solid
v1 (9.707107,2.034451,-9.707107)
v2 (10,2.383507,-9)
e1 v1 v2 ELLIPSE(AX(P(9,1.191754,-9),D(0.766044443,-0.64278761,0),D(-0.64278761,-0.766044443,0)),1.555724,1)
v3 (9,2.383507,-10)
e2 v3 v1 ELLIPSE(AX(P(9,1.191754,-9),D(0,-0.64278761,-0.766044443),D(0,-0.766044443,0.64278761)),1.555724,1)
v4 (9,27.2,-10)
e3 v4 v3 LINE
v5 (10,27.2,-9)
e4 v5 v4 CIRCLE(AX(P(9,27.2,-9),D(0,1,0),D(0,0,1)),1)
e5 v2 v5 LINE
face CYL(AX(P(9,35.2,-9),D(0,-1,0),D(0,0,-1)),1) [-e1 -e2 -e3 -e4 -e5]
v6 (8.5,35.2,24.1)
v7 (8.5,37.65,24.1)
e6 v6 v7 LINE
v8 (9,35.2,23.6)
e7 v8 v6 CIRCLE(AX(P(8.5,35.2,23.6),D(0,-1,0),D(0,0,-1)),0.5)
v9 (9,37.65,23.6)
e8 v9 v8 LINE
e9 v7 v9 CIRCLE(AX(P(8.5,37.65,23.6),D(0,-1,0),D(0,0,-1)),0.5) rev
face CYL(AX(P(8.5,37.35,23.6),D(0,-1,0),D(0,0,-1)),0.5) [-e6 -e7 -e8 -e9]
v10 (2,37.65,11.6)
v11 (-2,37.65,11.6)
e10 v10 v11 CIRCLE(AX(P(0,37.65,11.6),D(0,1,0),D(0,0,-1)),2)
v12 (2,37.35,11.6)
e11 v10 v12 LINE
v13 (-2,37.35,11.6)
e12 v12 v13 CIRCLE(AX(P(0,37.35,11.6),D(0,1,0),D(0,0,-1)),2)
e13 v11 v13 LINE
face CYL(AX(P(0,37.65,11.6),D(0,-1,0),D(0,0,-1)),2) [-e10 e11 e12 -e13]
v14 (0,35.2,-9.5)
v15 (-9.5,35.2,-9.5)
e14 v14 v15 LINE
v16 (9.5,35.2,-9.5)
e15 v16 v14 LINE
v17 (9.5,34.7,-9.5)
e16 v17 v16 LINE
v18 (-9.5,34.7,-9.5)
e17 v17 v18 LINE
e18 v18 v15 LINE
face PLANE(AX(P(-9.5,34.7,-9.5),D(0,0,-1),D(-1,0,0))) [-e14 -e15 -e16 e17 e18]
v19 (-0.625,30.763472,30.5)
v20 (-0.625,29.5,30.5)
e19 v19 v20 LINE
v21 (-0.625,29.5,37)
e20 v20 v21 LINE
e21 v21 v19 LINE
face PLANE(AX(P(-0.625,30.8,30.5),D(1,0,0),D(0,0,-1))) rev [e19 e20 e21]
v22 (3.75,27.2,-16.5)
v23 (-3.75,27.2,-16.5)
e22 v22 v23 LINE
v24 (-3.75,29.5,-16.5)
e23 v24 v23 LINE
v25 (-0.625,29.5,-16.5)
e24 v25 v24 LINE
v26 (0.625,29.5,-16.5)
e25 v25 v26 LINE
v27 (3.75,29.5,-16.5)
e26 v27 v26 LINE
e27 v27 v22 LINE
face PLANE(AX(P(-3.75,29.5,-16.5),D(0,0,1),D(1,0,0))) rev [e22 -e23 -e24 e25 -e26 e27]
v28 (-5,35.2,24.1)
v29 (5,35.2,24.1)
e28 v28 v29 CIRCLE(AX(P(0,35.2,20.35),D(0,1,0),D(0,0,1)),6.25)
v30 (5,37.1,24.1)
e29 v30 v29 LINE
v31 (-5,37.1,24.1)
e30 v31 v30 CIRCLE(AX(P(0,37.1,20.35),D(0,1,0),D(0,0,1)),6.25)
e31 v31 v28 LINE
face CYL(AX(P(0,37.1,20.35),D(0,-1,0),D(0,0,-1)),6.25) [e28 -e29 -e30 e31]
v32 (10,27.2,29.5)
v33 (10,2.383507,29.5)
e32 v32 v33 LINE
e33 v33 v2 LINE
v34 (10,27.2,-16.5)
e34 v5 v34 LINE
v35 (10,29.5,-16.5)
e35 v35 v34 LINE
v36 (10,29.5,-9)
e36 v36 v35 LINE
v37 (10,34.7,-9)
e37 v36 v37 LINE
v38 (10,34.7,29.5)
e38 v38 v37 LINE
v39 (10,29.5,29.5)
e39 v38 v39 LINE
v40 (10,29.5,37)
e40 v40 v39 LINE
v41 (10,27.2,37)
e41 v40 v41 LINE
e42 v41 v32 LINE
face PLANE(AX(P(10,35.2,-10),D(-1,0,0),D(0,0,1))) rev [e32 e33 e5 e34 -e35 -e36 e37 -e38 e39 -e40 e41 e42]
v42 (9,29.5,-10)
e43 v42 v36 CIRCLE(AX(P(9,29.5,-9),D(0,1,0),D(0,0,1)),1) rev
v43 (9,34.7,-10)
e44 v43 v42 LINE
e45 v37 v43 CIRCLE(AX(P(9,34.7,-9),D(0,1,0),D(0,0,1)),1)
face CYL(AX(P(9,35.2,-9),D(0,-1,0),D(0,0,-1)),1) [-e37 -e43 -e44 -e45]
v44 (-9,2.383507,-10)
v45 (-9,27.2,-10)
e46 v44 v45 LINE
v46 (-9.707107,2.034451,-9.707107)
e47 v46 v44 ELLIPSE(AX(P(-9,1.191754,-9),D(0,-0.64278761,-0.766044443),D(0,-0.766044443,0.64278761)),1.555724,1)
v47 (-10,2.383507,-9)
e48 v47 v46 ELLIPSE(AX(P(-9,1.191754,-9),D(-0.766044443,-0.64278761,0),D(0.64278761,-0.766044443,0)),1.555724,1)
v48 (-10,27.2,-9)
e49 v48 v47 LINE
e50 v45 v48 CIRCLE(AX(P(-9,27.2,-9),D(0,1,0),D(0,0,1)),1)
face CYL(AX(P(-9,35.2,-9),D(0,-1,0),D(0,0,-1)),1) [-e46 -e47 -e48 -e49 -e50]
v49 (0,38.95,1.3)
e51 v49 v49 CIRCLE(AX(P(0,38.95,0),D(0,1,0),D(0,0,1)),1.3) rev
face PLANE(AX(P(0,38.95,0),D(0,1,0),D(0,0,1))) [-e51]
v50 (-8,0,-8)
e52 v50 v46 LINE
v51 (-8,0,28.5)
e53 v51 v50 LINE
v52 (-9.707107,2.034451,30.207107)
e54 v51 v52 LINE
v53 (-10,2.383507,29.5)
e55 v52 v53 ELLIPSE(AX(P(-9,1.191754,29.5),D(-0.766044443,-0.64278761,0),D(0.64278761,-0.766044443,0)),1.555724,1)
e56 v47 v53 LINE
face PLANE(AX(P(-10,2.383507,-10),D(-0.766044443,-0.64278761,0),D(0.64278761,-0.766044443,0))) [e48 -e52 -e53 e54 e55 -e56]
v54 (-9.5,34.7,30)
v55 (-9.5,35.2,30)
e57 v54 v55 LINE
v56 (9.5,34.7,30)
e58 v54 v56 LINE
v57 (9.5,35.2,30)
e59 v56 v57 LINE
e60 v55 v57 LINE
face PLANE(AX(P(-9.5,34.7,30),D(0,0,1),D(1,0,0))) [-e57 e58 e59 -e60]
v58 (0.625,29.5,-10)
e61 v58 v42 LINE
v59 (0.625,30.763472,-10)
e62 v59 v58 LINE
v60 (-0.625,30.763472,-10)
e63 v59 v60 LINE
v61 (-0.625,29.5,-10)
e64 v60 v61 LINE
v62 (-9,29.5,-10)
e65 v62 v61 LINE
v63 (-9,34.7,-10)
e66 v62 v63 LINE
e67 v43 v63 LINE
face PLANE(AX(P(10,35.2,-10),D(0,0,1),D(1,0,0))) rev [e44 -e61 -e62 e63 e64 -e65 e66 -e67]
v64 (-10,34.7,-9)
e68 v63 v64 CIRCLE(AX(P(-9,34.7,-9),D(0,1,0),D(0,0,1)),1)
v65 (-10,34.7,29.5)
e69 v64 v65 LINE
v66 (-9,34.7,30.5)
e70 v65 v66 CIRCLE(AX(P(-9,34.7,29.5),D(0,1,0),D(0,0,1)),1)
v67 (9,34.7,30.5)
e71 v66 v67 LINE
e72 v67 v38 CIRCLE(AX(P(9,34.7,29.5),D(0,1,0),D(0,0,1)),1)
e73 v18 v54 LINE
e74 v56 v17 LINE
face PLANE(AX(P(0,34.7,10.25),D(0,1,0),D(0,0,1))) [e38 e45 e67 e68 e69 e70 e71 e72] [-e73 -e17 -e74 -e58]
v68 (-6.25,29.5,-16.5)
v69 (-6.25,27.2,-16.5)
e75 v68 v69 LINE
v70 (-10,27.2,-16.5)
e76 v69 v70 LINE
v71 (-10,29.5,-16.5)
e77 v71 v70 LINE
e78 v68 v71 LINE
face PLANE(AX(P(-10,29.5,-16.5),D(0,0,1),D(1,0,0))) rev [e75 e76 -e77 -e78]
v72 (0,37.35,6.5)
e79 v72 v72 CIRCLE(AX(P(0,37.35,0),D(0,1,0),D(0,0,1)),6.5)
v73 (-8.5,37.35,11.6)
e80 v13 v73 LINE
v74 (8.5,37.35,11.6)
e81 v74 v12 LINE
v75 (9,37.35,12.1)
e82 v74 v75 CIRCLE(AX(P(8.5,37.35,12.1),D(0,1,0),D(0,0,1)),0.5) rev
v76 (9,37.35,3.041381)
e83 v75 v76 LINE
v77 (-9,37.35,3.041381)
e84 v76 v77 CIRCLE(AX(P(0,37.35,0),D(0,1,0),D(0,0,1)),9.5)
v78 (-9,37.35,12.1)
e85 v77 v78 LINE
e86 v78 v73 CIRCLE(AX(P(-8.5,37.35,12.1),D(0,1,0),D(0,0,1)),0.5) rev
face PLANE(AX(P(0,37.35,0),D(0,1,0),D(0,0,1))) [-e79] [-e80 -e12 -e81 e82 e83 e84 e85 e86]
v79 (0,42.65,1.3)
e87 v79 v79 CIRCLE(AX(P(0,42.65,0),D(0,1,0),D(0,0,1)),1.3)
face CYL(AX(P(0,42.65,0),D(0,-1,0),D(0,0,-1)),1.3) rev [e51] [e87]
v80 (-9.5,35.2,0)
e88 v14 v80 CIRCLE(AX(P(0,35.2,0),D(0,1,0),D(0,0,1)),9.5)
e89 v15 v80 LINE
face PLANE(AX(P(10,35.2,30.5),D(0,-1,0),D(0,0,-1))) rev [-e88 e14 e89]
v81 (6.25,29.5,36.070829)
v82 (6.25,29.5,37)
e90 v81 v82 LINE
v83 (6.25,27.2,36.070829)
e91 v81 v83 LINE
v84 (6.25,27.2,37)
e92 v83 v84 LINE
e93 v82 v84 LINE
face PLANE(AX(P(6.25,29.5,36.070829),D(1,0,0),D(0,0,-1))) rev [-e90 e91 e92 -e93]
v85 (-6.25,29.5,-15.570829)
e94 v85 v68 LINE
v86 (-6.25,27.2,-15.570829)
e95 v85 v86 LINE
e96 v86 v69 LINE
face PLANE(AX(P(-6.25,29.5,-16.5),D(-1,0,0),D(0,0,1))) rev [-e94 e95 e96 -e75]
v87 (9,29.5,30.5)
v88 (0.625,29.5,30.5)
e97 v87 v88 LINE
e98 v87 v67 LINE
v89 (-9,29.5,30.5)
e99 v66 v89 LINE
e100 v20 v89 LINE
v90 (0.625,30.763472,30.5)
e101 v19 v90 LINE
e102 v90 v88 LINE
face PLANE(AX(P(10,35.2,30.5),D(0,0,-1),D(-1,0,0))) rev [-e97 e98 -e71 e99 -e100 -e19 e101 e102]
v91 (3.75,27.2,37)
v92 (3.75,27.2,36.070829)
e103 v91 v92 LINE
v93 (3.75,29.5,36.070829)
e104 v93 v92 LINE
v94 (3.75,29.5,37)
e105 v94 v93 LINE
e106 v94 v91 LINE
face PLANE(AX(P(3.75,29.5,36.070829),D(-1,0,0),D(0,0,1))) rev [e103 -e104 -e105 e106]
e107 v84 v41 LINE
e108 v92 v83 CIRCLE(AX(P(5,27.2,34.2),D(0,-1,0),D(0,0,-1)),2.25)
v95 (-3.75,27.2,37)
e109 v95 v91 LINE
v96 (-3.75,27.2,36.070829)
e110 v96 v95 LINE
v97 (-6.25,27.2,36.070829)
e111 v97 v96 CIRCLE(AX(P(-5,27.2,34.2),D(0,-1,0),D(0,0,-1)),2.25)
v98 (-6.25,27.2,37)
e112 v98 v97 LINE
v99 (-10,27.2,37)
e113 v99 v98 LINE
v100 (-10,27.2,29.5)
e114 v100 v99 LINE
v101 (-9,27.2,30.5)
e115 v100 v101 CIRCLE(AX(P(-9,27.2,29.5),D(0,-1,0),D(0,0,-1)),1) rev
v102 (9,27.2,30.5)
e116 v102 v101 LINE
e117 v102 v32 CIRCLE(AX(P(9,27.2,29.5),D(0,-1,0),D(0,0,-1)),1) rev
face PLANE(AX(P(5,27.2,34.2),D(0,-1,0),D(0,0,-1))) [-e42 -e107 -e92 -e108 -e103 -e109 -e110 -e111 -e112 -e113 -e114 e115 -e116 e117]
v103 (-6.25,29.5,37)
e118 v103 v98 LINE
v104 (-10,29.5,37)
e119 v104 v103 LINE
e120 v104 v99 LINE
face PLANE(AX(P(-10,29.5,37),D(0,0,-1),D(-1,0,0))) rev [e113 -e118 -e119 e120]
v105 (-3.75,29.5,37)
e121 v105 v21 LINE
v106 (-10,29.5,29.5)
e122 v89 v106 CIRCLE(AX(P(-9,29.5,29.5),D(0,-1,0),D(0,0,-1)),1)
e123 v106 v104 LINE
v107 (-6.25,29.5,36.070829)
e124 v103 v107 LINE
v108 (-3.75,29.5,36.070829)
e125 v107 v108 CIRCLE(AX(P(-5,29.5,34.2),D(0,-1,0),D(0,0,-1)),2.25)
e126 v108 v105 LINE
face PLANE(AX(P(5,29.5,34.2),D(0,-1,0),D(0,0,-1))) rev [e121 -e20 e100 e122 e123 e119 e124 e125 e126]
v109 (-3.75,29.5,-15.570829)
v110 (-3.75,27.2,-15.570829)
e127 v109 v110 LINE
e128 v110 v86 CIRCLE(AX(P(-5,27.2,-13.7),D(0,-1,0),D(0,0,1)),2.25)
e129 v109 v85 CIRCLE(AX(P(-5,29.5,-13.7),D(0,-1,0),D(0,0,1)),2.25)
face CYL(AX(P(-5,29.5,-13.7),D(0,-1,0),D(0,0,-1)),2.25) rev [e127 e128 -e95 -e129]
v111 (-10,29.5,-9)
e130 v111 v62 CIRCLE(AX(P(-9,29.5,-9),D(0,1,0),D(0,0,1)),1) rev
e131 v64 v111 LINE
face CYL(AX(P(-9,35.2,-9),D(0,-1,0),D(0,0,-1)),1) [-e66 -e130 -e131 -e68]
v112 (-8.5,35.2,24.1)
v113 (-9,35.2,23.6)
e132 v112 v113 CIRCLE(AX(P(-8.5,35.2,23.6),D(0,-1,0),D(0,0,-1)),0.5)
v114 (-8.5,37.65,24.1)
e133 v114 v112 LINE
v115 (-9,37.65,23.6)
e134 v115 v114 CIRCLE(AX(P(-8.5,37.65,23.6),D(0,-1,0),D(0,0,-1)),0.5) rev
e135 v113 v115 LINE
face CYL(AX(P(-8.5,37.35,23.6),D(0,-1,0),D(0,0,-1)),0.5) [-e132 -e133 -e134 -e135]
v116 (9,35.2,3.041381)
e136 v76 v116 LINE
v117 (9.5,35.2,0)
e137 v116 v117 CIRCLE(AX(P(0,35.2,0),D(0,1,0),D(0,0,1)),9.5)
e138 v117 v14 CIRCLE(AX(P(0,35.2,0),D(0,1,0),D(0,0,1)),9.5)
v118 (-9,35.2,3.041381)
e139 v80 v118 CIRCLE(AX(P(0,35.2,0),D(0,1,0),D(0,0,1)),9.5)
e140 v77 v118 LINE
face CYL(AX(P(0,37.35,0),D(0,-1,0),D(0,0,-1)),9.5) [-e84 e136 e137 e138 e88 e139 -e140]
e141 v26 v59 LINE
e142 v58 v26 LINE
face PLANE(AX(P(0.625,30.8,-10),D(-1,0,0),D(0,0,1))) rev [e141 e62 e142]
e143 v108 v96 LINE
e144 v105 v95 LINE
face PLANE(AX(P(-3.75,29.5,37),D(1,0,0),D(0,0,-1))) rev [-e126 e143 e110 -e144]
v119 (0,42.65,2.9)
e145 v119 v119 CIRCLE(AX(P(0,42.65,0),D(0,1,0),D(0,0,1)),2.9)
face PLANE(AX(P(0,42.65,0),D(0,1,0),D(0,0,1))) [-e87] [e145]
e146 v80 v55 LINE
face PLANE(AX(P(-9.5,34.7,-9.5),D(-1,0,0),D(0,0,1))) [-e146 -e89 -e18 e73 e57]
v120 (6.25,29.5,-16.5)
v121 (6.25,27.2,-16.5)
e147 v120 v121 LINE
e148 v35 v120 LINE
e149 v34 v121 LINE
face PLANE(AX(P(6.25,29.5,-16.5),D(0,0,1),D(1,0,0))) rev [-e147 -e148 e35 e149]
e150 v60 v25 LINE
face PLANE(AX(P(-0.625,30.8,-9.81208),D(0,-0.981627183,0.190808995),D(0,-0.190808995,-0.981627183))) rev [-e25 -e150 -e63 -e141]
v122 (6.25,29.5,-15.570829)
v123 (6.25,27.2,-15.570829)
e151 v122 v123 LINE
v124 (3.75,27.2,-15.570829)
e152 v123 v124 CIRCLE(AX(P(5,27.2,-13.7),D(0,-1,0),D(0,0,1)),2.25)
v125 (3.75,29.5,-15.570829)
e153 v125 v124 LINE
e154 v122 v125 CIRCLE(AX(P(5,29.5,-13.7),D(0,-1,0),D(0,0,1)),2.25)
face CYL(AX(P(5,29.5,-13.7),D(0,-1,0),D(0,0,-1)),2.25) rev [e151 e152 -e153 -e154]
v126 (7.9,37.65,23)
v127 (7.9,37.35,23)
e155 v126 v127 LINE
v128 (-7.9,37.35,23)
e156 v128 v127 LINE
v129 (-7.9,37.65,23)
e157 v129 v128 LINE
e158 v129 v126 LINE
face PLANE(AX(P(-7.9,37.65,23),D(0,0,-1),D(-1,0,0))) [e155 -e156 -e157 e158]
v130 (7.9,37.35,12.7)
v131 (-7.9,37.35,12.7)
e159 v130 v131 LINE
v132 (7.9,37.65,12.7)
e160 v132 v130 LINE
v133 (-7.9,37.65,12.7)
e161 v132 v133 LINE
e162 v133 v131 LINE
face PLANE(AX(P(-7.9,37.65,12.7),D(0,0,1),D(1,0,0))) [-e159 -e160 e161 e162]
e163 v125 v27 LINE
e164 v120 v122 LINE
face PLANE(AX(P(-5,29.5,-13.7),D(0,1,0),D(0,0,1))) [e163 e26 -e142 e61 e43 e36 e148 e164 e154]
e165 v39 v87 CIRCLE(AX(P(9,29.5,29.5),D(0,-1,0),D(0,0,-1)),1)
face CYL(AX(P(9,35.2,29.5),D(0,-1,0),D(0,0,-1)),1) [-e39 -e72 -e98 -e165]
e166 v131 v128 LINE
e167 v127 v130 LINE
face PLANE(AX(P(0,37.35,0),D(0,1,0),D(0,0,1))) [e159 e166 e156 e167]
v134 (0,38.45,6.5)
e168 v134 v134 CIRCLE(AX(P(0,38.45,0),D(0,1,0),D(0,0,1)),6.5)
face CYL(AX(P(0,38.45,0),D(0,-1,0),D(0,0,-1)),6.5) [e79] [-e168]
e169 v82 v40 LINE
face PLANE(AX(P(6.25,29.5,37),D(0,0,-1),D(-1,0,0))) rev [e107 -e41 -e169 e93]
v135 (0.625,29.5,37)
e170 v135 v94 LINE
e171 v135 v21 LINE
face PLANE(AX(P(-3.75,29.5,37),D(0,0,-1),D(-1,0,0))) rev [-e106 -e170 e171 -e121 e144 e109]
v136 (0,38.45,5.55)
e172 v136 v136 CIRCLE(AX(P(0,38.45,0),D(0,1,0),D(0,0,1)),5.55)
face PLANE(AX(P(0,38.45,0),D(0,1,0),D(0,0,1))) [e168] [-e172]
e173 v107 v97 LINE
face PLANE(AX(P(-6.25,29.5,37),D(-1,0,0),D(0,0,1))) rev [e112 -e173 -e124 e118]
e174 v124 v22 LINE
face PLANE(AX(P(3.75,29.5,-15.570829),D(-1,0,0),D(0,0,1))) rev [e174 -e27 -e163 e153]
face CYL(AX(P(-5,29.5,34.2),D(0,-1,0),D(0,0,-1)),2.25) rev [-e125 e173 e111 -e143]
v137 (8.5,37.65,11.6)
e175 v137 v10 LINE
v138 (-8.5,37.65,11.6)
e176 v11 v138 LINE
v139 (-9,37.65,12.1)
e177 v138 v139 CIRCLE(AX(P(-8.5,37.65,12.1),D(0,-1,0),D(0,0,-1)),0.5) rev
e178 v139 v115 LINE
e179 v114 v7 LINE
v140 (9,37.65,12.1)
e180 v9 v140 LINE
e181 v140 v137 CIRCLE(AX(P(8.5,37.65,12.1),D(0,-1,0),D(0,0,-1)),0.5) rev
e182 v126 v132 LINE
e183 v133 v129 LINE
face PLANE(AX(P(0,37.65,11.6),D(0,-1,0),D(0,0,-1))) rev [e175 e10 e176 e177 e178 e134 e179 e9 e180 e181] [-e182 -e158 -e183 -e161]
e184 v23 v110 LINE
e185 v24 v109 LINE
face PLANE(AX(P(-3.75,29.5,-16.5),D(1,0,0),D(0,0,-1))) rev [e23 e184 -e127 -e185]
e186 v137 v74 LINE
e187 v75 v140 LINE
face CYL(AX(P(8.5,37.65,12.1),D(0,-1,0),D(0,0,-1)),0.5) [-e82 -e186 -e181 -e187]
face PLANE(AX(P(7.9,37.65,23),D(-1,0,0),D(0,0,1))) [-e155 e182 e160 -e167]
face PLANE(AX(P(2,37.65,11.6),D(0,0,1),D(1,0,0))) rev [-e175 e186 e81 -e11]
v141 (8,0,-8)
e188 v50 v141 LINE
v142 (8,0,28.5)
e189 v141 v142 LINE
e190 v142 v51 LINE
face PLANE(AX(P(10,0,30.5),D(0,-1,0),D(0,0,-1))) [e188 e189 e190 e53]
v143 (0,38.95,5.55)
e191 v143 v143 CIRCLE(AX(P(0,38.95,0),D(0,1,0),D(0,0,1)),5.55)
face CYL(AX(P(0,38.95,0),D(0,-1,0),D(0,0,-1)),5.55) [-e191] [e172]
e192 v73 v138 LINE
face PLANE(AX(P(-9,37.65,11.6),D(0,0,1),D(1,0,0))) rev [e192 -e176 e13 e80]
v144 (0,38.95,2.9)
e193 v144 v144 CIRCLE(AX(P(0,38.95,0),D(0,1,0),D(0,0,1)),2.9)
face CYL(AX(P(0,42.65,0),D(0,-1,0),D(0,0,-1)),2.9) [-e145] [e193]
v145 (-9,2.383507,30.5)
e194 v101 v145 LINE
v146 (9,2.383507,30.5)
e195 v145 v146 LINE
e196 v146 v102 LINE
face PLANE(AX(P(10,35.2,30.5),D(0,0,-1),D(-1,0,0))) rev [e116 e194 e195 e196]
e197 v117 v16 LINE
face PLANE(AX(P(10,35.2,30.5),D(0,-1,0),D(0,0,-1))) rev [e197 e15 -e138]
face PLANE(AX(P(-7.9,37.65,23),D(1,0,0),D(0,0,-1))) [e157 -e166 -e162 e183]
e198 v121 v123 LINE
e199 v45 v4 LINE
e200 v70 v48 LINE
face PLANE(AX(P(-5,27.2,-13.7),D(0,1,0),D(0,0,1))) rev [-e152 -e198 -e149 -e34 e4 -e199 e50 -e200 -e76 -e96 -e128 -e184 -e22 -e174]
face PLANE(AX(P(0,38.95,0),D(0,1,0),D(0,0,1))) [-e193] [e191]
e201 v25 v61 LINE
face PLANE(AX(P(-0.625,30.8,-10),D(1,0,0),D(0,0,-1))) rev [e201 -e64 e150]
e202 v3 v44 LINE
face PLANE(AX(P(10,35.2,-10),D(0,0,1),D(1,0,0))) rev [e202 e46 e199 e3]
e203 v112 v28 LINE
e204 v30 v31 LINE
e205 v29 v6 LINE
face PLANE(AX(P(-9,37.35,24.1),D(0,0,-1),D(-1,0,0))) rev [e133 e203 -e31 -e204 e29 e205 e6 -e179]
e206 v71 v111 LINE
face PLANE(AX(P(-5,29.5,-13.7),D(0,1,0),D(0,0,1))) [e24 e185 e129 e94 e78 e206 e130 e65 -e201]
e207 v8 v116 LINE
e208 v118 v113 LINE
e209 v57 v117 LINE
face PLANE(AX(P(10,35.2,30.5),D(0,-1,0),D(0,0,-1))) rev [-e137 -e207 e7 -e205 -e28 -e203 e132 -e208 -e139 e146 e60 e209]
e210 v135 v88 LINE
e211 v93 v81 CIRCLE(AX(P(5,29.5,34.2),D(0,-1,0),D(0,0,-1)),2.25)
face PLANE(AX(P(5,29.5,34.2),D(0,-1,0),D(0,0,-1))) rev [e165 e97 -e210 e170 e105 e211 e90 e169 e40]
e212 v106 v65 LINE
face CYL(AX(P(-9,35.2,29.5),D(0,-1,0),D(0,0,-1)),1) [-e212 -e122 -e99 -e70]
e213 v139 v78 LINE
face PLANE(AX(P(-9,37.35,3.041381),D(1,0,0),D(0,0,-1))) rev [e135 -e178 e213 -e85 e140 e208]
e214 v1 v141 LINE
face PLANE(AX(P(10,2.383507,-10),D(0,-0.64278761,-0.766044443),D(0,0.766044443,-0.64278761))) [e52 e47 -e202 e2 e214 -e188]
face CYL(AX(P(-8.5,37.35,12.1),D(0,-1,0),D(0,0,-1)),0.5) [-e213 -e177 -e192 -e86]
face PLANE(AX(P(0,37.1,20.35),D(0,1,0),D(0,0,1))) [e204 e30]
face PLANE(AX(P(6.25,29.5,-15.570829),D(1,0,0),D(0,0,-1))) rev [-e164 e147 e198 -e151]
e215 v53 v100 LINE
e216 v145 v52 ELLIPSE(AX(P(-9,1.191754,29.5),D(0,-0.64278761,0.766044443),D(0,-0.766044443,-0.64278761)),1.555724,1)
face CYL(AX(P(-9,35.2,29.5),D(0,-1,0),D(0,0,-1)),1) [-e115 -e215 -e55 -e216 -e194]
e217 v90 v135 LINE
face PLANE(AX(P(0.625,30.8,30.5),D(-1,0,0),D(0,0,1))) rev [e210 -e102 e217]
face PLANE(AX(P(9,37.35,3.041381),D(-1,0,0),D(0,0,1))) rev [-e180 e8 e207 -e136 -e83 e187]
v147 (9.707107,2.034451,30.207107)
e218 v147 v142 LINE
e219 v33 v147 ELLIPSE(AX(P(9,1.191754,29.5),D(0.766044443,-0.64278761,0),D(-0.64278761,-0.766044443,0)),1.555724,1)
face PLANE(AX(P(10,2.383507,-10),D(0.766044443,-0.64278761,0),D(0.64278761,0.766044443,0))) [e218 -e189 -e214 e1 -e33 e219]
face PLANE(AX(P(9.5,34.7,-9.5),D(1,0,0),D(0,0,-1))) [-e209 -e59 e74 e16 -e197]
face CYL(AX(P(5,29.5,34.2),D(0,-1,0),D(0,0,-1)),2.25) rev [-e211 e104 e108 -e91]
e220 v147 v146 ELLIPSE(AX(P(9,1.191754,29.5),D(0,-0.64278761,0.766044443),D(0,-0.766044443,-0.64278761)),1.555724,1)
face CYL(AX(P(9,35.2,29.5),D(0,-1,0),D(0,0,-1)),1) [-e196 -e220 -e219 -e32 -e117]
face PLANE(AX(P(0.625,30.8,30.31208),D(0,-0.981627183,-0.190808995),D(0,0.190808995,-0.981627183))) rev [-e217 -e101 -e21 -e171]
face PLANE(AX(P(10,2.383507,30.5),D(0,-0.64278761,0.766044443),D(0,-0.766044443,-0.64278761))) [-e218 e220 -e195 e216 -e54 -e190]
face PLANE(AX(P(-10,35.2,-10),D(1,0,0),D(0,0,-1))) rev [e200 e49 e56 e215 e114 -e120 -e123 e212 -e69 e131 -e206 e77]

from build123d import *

# Parameters (mm, degrees)
SKETCH1_W           = 20
SKETCH1_H           = 40.5
BOSS_EXTRUDE1_DEPTH = 35.2
CHAMFER1_SIZE       = 2
CHAMFER1_SIZE2      = 2.383507185
BOSS_EXTRUDE2_DEPTH = 2.3
SKETCH3_W           = 1.25
SKETCH3_H           = 6.5
BOSS_EXTRUDE3_DEPTH = 1.3
CHAMFER2_SIZE       = 6.687920221
CHAMFER2_SIZE_2     = 1.3
SKETCH5_OUTSIDE_W   = 35.418
SKETCH5_OUTSIDE_H   = 68.918
SKETCH5_OUTSIDE_W_2 = 19
SKETCH5_OUTSIDE_H_2 = 39.5
CUT_EXTRUDE1_DEPTH  = 0.5
BOSS_EXTRUDE4_DEPTH = 2.15
BOSS_EXTRUDE5_DEPTH = 1.9
SKETCH8_R           = 6.5
BOSS_EXTRUDE6_DEPTH = 1.1
SKETCH9_R           = 5.55
BOSS_EXTRUDE7_DEPTH = 0.5
SKETCH10_R          = 2.9
SKETCH10_R_2        = 1.3
BOSS_EXTRUDE8_DEPTH = 3.7
SKETCH11_W          = 15.8
SKETCH11_H          = 10.3
BOSS_EXTRUDE9_DEPTH = 0.3
FILLET1_R           = 0.5
FILLET2_R           = 1


with BuildPart() as part:
    # Sketch1 → Boss-Extrude1 (new body)
    with BuildSketch(Plane(origin=(0, 0, 0), x_dir=(1, 0, 0), z_dir=(0, 1, 0))):
        with Locations((0, -10.25)):
            Rectangle(SKETCH1_W, SKETCH1_H)
    extrude(amount=BOSS_EXTRUDE1_DEPTH)

    # Chamfer1
    chamfer1_edges = [part.edges().sort_by_distance(p)[0] for p in [
        (0, 0, 30.5),
        (-10, 0, 10.25),
        (0, 0, -10),
        (10, 0, 10.25),
    ]]
    chamfer1_side = [part.faces().sort_by_distance(p)[0] for p in [
        (0, 0, 10.25),
    ]]
    chamfer(chamfer1_edges, length=CHAMFER1_SIZE, length2=CHAMFER1_SIZE2, reference=chamfer1_side[0])

    # Sketch2 → Boss-Extrude2 (add)
    with BuildSketch(Plane(origin=(0, 27.2, 0), x_dir=(-1, 0, 0), z_dir=(0, 1, 0))):
        with BuildLine():
            Line((10, -10), (-10, -10))
            Line((-10, -10), (-10, -16.5))
            Line((-10, -16.5), (-6.25, -16.5))
            Line((-6.25, -16.5), (-6.25, -15.570828693))
            ThreePointArc((-6.25, -15.570828693), (-5, -11.45), (-3.75, -15.570828693))
            Line((-3.75, -15.570828693), (-3.75, -16.5))
            Line((-3.75, -16.5), (3.75, -16.5))
            Line((3.75, -16.5), (3.75, -15.570828693))
            ThreePointArc((3.75, -15.570828693), (5, -11.45), (6.25, -15.570828693))
            Line((6.25, -15.570828693), (6.25, -16.5))
            Line((6.25, -16.5), (10, -16.5))
            Line((10, -16.5), (10, -10))
        make_face()
        with BuildLine():
            Line((-6.25, 37), (-10, 37))
            Line((-10, 37), (-10, 30.5))
            Line((-10, 30.5), (10, 30.5))
            Line((10, 30.5), (10, 37))
            Line((10, 37), (6.25, 37))
            Line((6.25, 37), (6.25, 36.070828693))
            ThreePointArc((6.25, 36.070828693), (5, 31.95), (3.75, 36.070828693))
            Line((3.75, 36.070828693), (3.75, 37))
            Line((3.75, 37), (-3.75, 37))
            Line((-3.75, 37), (-3.75, 36.070828693))
            ThreePointArc((-3.75, 36.070828693), (-5, 31.95), (-6.25, 36.070828693))
            Line((-6.25, 36.070828693), (-6.25, 37))
        make_face()
    extrude(amount=BOSS_EXTRUDE2_DEPTH)

    # Sketch3 → Boss-Extrude3 (add)
    with BuildSketch(Plane(origin=(0, 29.5, 0), x_dir=(1, 0, 0), z_dir=(0, 1, 0))):
        with Locations((0, -33.75)):
            Rectangle(SKETCH3_W, SKETCH3_H)
        with Locations((0, 13.25)):
            Rectangle(SKETCH3_W, SKETCH3_H)
    extrude(amount=BOSS_EXTRUDE3_DEPTH)

    # Chamfer2
    # the kernel refuses this chamfer: 6.687920221, 1.3 mm, written as the material it takes off along each edge
    with BuildSketch(Plane(origin=(-18.001773564, 30.8, 37), x_dir=(0, 0.007343799087842576, -0.9999730339438946), z_dir=(1, 0, 0))) as chamfer2_piece_1_section:
        Polygon((CHAMFER2_SIZE * 0.999973033908, -CHAMFER2_SIZE * 0.00734379908758), (-CHAMFER2_SIZE_2 * 0.00734379908784, -CHAMFER2_SIZE_2 * 0.999973033944), (0, 0), align=None)
    chamfer2_piece_1 = extrude(amount=36.003547128, mode=Mode.PRIVATE)
    chamfer2_piece_1 = split(chamfer2_piece_1, bisect_by=Plane(origin=(0, 30.433956973, 30.5), z_dir=(0, 0, 1)), keep=Keep.TOP, mode=Mode.PRIVATE)
    add(chamfer2_piece_1, mode=Mode.SUBTRACT)
    with BuildSketch(Plane(origin=(18.001773564, 30.8, -16.5), x_dir=(0, -0.9816291836389949, -0.19079870499623547), z_dir=(-1, 0, 0))) as chamfer2_piece_2_section:
        Polygon((CHAMFER2_SIZE_2 * 0.981629183639, CHAMFER2_SIZE_2 * 0.190798704996), (-CHAMFER2_SIZE * 0.190798704989, CHAMFER2_SIZE * 0.981629183604), (0, 0), align=None)
    chamfer2_piece_2 = extrude(amount=36.003547128, mode=Mode.PRIVATE)
    chamfer2_piece_2 = split(chamfer2_piece_2, bisect_by=Plane(origin=(0, 30.433956973, -10), z_dir=(0, 0, -1)), keep=Keep.TOP, mode=Mode.PRIVATE)
    add(chamfer2_piece_2, mode=Mode.SUBTRACT)

    # Sketch5 outside → Cut-Extrude1 (cut)
    with BuildSketch(Plane(origin=(0, 35.2, 0), x_dir=(1, 0, 0), z_dir=(0, 1, 0))):
        with Locations((0, -10.25)):
            Rectangle(SKETCH5_OUTSIDE_W, SKETCH5_OUTSIDE_H)
        with Locations((0, -10.25)):
            Rectangle(SKETCH5_OUTSIDE_W_2, SKETCH5_OUTSIDE_H_2, mode=Mode.SUBTRACT)
    extrude(amount=-CUT_EXTRUDE1_DEPTH, mode=Mode.SUBTRACT)

    # Sketch6 → Boss-Extrude4 (add)
    with BuildSketch(Plane(origin=(0, 35.2, 0), x_dir=(1, 0, 0), z_dir=(0, 1, 0))):
        with BuildLine():
            Line((-9, -3.041381265), (-9, -24.1))
            Line((-9, -24.1), (9, -24.1))
            Line((9, -24.1), (9, -3.041381265))
            ThreePointArc((9, -3.041381265), (0, 9.5), (-9, -3.041381265))
        make_face()
    extrude(amount=BOSS_EXTRUDE4_DEPTH)

    # Sketch7 → Boss-Extrude5 (add)
    with BuildSketch(Plane(origin=(0, 35.2, 0), x_dir=(1, 0, 0), z_dir=(0, 1, 0))):
        with BuildLine():
            Line((-5, -24.1), (5, -24.1))
            ThreePointArc((5, -24.1), (0, -26.6), (-5, -24.1))
        make_face()
    extrude(amount=BOSS_EXTRUDE5_DEPTH)

    # Sketch8 → Boss-Extrude6 (add)
    with BuildSketch(Plane(origin=(0, 37.35, 0), x_dir=(1, 0, 0), z_dir=(0, 1, 0))):
        with Locations(Location((0, 0, 0), (0, 0, 270))):
            Circle(SKETCH8_R)
    extrude(amount=BOSS_EXTRUDE6_DEPTH)

    # Sketch9 → Boss-Extrude7 (add)
    with BuildSketch(Plane(origin=(0, 38.45, 0), x_dir=(1, 0, 0), z_dir=(0, 1, 0))):
        with Locations(Location((0, 0, 0), (0, 0, 270))):
            Circle(SKETCH9_R)
    extrude(amount=BOSS_EXTRUDE7_DEPTH)

    # Sketch10 → Boss-Extrude8 (add)
    with BuildSketch(Plane(origin=(0, 38.95, 0), x_dir=(1, 0, 0), z_dir=(0, 1, 0))):
        with Locations(Location((0, 0, 0), (0, 0, 270))):
            Circle(SKETCH10_R)
        with Locations(Location((0, 0, 0), (0, 0, 270))):
            Circle(SKETCH10_R_2, mode=Mode.SUBTRACT)
    extrude(amount=BOSS_EXTRUDE8_DEPTH)

    # Sketch11 → Boss-Extrude9 (add)
    with BuildSketch(Plane(origin=(0, 37.35, 0), x_dir=(1, 0, 0), z_dir=(0, 1, 0))):
        with BuildLine():
            Line((-9, -24.1), (9, -24.1))
            Line((9, -24.1), (9, -11.6))
            Line((9, -11.6), (2, -11.6))
            ThreePointArc((2, -11.6), (0, -9.6), (-2, -11.6))
            Line((-2, -11.6), (-9, -11.6))
            Line((-9, -11.6), (-9, -24.1))
        make_face()
        with Locations((0, -17.85)):
            Rectangle(SKETCH11_W, SKETCH11_H, mode=Mode.SUBTRACT)
    extrude(amount=BOSS_EXTRUDE9_DEPTH)

    # Fillet1
    fillet1_edges = [part.edges().sort_by_distance(p)[0] for p in [
        (-9, 36.425, 24.1),
        (9, 36.425, 24.1),
        (-9, 37.5, 11.6),
        (9, 37.5, 11.6),
    ]]
    fillet(fillet1_edges, radius=FILLET1_R)

    # Fillet2
    fillet2_edges = [part.edges().sort_by_distance(p)[0] for p in [
        (10, 14.791753593, -10),
        (10, 32.1, -10),
        (10, 32.1, 30.5),
        (10, 14.791753593, 30.5),
        (-10, 32.1, 30.5),
        (-10, 14.791753593, 30.5),
        (-10, 14.791753593, -10),
        (-10, 32.1, -10),
    ]]
    fillet(fillet2_edges, radius=FILLET2_R)


solid = part.part
